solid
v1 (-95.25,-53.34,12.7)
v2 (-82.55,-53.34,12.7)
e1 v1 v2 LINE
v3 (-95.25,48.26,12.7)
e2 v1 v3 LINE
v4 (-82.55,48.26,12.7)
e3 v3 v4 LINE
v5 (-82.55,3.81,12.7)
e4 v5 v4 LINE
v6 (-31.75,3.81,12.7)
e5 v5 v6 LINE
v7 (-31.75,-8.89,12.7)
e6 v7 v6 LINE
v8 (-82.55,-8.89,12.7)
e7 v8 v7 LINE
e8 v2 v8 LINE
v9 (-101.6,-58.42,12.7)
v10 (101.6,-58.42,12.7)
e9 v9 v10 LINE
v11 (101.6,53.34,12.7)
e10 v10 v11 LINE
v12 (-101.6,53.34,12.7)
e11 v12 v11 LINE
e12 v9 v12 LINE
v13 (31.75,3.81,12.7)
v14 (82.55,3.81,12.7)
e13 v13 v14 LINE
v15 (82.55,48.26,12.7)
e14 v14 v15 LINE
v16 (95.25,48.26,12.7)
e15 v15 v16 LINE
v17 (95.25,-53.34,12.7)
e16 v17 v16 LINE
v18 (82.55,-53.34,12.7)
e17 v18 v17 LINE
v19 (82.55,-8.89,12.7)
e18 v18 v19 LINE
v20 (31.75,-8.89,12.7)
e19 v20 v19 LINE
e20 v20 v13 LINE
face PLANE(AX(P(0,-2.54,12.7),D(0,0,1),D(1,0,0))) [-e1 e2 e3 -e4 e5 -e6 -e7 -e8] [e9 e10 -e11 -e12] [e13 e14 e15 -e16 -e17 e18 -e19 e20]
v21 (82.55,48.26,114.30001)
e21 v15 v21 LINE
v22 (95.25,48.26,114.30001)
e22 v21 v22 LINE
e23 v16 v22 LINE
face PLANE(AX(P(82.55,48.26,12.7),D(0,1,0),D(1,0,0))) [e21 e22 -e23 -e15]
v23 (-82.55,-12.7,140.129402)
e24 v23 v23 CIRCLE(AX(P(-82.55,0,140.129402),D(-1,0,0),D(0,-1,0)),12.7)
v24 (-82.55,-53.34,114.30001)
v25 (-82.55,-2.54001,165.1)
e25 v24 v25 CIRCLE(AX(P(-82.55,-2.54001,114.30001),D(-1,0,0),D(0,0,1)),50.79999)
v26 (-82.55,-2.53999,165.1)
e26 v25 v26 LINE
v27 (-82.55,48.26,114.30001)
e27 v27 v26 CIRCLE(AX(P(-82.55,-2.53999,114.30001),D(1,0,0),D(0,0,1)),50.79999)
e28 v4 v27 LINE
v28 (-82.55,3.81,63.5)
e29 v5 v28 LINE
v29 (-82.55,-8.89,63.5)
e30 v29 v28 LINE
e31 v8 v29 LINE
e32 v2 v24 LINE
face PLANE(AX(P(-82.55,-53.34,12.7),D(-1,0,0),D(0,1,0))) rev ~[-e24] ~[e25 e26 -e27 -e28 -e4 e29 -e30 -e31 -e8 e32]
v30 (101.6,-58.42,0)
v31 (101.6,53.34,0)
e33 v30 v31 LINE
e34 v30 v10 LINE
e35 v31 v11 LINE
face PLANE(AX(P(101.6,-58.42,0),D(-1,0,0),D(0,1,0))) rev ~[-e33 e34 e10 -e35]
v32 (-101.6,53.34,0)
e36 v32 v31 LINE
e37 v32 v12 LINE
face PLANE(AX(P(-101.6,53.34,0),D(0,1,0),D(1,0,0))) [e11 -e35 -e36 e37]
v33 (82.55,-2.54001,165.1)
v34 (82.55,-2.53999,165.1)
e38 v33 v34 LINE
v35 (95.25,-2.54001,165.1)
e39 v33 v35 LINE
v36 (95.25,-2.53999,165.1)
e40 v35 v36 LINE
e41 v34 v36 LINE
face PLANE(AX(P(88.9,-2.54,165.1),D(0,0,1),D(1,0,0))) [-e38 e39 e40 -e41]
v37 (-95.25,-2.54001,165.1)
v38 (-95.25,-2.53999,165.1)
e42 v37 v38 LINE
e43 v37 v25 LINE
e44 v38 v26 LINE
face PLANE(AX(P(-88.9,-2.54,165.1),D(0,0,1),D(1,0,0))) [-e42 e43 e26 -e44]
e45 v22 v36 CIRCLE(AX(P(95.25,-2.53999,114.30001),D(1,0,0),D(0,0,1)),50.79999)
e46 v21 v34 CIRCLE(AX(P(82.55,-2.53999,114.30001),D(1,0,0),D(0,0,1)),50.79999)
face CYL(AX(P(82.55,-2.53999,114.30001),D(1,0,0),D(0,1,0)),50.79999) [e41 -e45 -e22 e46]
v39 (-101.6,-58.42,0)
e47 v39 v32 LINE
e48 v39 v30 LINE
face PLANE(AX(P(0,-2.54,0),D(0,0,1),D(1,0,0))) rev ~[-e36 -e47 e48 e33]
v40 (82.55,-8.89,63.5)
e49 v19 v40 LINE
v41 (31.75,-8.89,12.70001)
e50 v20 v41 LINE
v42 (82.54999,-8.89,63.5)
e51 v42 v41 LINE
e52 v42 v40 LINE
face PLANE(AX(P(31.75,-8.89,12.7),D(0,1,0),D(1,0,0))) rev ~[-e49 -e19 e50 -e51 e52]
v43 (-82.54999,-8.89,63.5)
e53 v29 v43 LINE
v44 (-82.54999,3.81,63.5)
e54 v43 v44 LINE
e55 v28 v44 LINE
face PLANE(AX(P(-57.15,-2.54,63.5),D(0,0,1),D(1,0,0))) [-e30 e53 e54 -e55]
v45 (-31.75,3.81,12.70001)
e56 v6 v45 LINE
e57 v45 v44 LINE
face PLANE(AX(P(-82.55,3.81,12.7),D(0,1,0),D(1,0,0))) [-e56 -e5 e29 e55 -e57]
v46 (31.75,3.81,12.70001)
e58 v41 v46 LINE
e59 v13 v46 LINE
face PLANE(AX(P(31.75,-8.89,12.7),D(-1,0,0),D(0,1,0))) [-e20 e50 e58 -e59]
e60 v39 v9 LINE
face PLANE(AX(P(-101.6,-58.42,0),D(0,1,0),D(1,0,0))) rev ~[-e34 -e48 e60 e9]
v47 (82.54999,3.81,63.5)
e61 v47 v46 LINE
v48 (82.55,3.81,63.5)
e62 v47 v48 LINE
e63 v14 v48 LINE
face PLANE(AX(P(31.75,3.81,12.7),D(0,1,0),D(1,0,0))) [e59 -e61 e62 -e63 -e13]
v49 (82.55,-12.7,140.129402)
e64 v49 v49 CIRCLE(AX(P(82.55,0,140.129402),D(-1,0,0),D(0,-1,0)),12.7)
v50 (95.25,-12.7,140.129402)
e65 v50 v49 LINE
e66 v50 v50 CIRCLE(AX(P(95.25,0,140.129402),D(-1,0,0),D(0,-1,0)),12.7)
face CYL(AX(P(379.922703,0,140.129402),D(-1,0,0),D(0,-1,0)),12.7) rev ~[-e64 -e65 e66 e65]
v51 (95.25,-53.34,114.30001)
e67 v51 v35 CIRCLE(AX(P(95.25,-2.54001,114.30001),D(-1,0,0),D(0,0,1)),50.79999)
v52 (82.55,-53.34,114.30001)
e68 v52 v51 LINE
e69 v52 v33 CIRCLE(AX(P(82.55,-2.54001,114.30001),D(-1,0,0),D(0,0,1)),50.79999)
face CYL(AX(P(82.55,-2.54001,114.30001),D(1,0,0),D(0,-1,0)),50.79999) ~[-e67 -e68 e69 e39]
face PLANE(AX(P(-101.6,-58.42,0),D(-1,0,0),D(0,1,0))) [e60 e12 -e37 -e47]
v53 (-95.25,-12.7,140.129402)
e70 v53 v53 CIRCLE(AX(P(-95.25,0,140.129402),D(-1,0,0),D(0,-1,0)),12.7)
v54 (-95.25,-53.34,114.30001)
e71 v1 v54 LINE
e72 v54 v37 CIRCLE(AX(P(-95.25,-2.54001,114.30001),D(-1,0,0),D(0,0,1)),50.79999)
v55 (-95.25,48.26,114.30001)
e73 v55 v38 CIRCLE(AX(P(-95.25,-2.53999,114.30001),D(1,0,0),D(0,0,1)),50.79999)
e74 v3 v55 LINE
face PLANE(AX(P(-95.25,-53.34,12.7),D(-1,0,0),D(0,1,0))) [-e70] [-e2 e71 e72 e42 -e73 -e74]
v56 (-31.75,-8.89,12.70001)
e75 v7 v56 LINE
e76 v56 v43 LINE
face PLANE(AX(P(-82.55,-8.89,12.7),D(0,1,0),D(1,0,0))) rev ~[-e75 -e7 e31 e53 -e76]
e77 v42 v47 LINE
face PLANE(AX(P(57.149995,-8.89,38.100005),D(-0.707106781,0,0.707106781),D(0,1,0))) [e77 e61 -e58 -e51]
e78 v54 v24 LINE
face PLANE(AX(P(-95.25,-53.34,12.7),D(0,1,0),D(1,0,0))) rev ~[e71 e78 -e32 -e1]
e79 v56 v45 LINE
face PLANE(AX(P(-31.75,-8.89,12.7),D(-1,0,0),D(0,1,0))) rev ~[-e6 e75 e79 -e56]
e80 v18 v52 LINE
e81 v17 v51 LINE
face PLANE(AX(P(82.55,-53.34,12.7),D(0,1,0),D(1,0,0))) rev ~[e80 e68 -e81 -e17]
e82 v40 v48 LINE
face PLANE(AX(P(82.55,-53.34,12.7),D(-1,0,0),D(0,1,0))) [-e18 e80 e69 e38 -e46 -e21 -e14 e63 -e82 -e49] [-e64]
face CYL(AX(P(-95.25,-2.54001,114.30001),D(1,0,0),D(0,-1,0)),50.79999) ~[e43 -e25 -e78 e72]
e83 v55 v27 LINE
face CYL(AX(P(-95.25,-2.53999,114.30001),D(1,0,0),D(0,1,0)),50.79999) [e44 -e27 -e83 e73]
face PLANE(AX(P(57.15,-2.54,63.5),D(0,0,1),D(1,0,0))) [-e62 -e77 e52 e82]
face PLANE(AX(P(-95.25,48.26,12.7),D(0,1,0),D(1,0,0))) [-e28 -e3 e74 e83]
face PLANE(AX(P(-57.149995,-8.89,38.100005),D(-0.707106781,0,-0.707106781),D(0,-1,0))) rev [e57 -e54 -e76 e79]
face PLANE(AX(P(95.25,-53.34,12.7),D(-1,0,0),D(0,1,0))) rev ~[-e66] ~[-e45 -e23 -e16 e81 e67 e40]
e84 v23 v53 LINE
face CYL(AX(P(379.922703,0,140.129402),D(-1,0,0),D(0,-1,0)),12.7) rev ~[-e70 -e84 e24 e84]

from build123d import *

# Parameters (mm, degrees)
F0_W     = 203.2
F0_H     = 111.76
F1_DEPTH = 12.7
F2_W     = 12.7
F2_H     = 101.6
F3_DEPTH = 152.4
F5_D     = 25.4
F6_R     = 50.79999
F7_R     = 50.79999
F8_W     = 50.8
F8_H     = 12.7
F9_DEPTH = 50.8
F10_SIZE = 50.79999


# Not quite as in the source:
# - a fillet or chamfer is up to 0.001 mm smaller than in the source, because OpenCascade refuses the exact size
# - a feature names something its author has since deleted; it is built from what else it names


with BuildPart() as f1:
    # F0 (on Top) → F1 (new body)
    with BuildSketch(Plane.XY):
        with Locations((0, -2.54)):
            Rectangle(F0_W, F0_H)
    extrude(amount=F1_DEPTH)

    # F2 (on face) → F3 (join)
    with BuildSketch(Plane.XY.offset(12.7)):
        with Locations((-88.9, -2.54)):
            Rectangle(F2_W, F2_H)
        with Locations((88.9, -2.54)):
            Rectangle(F2_W, F2_H)
    extrude(amount=F3_DEPTH)

    # F5 (through all)
    with Locations(Plane.YZ.offset(95.25)):
        with Locations((0, 140.1294022799)):
            Hole(F5_D / 2)

    # F6 (radius 50.8 in the source; OpenCascade refuses exactly that, so slightly less here)
    f6_edges = [f1.edges().sort_by_distance(p)[0] for p in [
        (-88.9, -53.34, 165.1),
        (-88.9, 48.26, 165.1),
    ]]
    fillet(f6_edges, radius=F6_R)

    # F7 (radius 50.8 in the source; OpenCascade refuses exactly that, so slightly less here)
    f7_edges = [f1.edges().sort_by_distance(p)[0] for p in [
        (88.9, -53.34, 165.1),
        (88.9, 48.26, 165.1),
    ]]
    fillet(f7_edges, radius=F7_R)

    # F8 (on face) → F9 (join)
    with BuildSketch(Plane.XY.offset(12.7)):
        with Locations((-57.15, -2.54)):
            Rectangle(F8_W, F8_H)
        with Locations((57.15, -2.54)):
            Rectangle(F8_W, F8_H)
    extrude(amount=F9_DEPTH)

    # F10 (size 50.8 in the source; OpenCascade refuses exactly that, so slightly less here)
    f10_edges = [f1.edges().sort_by_distance(p)[0] for p in [
        (-31.75, -2.54, 63.5),
        (31.75, -2.54, 63.5),
    ]]
    chamfer(f10_edges, length=F10_SIZE)


solid = f1.part
